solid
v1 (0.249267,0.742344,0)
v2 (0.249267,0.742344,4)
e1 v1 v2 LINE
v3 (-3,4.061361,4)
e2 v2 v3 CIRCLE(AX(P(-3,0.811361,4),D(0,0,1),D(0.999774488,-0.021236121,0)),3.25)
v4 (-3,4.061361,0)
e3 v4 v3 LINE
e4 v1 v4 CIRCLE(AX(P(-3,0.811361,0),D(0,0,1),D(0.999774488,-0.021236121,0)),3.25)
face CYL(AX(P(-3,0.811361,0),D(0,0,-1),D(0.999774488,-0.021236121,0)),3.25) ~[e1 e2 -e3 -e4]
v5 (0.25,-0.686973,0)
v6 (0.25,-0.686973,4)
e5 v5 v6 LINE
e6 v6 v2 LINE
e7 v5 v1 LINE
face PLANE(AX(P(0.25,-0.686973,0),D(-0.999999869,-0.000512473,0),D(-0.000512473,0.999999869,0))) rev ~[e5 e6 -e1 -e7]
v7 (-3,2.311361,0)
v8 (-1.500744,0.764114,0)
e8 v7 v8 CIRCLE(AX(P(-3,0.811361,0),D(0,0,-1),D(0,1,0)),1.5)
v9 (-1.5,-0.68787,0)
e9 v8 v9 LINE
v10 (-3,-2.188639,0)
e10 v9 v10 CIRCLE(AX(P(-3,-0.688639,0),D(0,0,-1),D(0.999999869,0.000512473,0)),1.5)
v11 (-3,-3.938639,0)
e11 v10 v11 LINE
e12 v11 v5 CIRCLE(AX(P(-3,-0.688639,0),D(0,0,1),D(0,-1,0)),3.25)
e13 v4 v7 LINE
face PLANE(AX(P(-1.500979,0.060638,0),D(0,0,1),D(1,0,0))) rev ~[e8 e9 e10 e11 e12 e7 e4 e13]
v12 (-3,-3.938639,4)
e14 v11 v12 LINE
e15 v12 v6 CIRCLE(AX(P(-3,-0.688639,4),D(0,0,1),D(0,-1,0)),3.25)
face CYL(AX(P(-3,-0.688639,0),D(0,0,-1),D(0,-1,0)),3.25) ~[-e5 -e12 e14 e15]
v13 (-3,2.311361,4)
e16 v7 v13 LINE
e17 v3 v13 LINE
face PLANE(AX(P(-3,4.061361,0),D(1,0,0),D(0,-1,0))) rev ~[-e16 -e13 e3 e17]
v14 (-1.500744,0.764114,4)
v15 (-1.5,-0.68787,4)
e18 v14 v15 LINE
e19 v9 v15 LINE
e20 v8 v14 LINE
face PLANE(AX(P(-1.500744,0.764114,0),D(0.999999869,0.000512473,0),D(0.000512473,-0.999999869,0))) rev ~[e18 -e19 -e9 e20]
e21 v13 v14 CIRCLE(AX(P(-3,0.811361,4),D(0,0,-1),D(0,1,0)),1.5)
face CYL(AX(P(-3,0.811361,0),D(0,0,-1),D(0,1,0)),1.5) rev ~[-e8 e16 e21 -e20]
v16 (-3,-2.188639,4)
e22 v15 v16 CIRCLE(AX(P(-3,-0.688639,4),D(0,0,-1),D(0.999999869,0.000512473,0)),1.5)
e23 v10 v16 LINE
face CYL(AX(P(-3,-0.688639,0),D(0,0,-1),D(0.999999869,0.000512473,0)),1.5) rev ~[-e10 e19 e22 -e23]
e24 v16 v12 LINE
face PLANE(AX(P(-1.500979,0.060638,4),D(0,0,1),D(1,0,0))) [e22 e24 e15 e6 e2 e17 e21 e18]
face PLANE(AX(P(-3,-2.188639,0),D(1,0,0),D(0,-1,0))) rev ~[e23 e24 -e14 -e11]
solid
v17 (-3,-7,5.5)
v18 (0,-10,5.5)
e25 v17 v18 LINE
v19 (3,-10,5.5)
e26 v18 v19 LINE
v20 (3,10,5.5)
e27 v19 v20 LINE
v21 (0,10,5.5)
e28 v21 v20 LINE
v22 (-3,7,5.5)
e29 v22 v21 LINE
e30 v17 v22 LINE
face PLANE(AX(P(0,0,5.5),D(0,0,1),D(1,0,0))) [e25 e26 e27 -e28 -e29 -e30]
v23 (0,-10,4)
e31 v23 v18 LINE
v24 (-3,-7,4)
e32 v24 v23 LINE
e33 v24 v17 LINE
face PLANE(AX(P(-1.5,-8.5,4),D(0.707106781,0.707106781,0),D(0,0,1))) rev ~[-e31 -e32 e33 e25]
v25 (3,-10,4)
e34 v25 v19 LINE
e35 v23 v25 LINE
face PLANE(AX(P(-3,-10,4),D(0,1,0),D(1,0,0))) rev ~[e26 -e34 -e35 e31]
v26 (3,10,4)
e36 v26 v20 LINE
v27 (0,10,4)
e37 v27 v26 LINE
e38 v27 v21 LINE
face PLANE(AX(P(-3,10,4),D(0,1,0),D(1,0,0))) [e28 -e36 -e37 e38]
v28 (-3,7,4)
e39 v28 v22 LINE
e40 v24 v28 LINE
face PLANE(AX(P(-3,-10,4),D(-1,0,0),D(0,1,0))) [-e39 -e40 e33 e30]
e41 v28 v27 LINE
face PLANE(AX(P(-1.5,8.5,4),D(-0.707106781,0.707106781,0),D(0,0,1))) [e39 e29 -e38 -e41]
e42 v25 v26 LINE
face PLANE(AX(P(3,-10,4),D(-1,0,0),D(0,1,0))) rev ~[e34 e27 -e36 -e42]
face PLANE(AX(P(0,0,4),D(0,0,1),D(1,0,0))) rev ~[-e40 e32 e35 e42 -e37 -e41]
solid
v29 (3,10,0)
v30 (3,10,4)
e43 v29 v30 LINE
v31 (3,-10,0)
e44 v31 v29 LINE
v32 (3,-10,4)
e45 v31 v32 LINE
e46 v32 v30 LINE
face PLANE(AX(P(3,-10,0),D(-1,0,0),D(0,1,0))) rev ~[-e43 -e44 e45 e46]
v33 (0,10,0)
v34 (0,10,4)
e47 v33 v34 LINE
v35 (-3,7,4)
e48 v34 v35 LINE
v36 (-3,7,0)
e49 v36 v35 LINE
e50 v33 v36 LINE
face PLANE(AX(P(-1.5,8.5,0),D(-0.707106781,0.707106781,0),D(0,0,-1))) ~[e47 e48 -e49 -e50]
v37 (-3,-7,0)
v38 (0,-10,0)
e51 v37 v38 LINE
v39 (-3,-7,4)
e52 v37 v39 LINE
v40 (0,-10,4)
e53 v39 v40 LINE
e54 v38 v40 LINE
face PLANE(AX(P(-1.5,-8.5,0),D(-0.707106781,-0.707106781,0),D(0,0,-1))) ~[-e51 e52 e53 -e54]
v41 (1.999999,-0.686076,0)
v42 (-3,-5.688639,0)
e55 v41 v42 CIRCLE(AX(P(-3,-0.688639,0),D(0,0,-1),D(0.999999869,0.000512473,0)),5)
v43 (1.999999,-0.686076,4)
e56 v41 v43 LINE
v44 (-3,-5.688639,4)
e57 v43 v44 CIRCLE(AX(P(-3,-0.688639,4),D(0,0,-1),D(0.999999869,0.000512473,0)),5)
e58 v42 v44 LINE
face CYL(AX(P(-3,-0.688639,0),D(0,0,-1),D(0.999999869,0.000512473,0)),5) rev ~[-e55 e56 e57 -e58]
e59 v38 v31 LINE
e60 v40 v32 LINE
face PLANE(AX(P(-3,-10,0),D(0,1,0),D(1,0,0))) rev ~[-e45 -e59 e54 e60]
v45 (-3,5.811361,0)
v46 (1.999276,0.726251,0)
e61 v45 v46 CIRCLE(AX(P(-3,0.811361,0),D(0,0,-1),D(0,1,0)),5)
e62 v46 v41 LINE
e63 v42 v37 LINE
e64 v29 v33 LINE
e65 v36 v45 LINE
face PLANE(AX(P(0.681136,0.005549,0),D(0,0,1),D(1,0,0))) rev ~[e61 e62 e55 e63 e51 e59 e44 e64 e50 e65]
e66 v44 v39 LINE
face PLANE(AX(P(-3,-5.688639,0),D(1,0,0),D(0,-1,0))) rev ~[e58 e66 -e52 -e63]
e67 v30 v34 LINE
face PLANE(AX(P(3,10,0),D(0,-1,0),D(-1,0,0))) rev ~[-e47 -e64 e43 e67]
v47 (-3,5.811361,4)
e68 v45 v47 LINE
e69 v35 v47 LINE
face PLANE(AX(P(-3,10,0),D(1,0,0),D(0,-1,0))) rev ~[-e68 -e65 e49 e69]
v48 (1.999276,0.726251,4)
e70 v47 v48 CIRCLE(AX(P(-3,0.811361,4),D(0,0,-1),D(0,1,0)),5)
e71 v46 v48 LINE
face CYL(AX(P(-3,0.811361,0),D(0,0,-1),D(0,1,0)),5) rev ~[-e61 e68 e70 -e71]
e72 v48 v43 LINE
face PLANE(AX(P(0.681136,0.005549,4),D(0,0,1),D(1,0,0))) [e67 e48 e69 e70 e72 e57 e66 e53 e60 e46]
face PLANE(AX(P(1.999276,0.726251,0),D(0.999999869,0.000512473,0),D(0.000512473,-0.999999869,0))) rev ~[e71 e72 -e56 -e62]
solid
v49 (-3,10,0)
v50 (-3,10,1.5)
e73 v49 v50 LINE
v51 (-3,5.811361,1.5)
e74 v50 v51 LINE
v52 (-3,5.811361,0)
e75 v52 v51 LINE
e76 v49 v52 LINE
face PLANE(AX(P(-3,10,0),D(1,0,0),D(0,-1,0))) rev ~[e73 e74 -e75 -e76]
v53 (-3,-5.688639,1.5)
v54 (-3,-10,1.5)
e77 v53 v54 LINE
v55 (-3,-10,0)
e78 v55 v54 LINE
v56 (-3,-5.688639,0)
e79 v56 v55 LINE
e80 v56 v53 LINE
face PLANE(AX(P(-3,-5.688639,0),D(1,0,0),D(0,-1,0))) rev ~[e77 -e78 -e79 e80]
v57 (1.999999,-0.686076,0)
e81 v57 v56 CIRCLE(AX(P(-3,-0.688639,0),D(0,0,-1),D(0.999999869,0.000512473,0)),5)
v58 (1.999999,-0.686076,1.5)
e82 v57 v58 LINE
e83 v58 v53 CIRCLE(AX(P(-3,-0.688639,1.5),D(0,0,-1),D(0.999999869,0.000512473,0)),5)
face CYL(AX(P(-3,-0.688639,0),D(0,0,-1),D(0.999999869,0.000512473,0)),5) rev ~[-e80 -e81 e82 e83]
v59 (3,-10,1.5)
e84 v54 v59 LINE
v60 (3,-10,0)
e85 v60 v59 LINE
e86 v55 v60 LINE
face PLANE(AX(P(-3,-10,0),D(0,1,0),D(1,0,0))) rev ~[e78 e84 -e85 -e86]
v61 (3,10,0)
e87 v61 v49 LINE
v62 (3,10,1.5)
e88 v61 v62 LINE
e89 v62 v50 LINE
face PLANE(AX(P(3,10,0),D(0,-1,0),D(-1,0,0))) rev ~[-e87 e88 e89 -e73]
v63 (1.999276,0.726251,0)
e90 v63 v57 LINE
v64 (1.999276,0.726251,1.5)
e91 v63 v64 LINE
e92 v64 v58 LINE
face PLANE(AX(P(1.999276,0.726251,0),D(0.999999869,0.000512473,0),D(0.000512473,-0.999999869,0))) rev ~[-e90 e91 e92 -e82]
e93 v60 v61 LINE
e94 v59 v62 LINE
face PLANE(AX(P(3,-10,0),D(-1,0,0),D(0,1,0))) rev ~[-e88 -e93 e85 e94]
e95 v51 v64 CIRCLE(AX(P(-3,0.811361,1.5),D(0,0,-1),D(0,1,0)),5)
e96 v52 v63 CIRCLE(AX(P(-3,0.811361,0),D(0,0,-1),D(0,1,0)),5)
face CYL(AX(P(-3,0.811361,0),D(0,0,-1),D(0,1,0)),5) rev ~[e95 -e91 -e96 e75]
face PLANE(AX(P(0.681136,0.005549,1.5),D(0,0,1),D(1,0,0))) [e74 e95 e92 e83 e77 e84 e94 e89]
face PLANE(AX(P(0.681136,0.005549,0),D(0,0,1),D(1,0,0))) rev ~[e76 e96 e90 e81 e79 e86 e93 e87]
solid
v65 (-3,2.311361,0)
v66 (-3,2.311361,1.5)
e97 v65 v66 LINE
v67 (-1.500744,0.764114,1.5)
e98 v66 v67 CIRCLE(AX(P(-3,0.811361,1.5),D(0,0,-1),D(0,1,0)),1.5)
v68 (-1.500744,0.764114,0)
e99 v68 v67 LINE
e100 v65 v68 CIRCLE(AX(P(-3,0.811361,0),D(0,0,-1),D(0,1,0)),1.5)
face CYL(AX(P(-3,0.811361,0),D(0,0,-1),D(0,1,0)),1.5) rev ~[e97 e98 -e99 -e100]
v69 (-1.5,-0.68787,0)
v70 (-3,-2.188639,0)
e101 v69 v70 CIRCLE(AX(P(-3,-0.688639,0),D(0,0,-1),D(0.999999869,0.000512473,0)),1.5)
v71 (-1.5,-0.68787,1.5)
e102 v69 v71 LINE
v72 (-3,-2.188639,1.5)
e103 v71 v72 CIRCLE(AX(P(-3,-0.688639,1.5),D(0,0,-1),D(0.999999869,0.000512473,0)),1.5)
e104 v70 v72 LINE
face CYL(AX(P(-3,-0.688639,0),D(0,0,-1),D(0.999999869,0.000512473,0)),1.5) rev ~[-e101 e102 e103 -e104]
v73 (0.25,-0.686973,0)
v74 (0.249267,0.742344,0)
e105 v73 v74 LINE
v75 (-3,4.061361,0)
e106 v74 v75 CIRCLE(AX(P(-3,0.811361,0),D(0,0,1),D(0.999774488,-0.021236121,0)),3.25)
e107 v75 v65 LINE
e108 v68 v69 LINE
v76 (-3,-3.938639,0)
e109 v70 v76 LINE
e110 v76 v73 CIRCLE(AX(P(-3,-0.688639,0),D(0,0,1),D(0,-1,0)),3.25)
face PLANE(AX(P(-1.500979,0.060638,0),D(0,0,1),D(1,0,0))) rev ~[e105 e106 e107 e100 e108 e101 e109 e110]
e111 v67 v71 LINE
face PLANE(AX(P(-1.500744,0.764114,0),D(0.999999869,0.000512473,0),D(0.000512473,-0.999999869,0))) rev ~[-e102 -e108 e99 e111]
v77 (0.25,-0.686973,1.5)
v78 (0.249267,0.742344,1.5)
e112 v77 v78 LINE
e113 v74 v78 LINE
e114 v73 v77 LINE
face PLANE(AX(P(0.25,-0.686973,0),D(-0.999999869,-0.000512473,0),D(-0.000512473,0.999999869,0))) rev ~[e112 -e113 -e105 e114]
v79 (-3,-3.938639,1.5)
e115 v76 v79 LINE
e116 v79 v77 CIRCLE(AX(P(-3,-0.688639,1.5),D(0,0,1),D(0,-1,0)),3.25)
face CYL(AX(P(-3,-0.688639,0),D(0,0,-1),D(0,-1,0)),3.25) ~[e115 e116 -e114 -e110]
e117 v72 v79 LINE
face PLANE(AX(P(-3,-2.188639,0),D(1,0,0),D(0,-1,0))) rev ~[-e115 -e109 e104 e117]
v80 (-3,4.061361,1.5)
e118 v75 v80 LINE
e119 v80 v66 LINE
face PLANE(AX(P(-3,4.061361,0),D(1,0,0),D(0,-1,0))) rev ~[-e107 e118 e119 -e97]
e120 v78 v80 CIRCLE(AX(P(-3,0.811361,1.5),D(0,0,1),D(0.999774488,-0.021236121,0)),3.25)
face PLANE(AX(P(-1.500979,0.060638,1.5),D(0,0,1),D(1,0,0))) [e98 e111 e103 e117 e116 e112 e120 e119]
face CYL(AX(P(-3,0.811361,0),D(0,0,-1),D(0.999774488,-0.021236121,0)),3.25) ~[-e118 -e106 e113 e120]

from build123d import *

# Parameters (mm, degrees)
F1_DEPTH  = 4
F3_W      = 6
F3_H      = 20
F4_DEPTH  = 1.5
F5_SIZE   = 3
F5_2_SIZE = 3


with BuildPart() as f1:
    # F0 (on Top) → F1 (new body)
    with BuildSketch(Plane.XY):
        with BuildLine():
            Line((3, -10), (3, 10))
            Line((3, 10), (-3, 10))
            Line((-3, 10), (-3, 5.8113613003))
            ThreePointArc((-3, 5.8113613003), (0.5654981212, 4.3166748595), (1.9992755637, 0.7262505595))
            Line((1.9992755637, 0.7262505595), (1.9999993434, -0.6860763339))
            ThreePointArc((1.9999993434, -0.6860763339), (0.536439723, -4.2232665564), (-3, -5.6886386997))
            Line((-3, -5.6886386997), (-3, -10))
            Line((-3, -10), (3, -10))
        make_face()
    extrude(amount=F1_DEPTH)

    # F5
    f5_edges = [f1.edges().sort_by_distance(p)[0] for p in [
        (-3, 10, 2),
        (-3, -10, 2),
    ]]
    chamfer(f5_edges, length=F5_SIZE)


with BuildPart() as f1b:
    # F0 (on Top) → F1, piece 2 (new body)
    with BuildSketch(Plane.XY):
        with BuildLine():
            ThreePointArc((-3, 2.3113613003), (-1.9227647543, 1.8551832321), (-1.5007442997, 0.7641136008))
            Line((-1.5007442997, 0.7641136008), (-1.500000197, -0.68786999))
            ThreePointArc((-1.500000197, -0.68786999), (-1.9390680831, -1.7490270567), (-3, -2.1886386997))
            Line((-3, -2.1886386997), (-3, -3.9386386997))
            ThreePointArc((-3, -3.9386386997), (-0.70131418, -2.9861468066), (0.2499995732, -0.6869731619))
            Line((0.2499995732, -0.6869731619), (0.2492670865, 0.7423439064))
            ThreePointArc((0.2492670865, 0.7423439064), (-0.6776298174, 3.084926064), (-3, 4.0613613003))
            Line((-3, 4.0613613003), (-3, 2.3113613003))
        make_face()
    extrude(amount=F1_DEPTH)


with BuildPart() as f4:
    # F3 (on face) → F4 (new body)
    with BuildSketch(Plane.XY.offset(4)):
        Rectangle(F3_W, F3_H)
    extrude(amount=F4_DEPTH)

    # F5#2
    f5_2_edges = [f4.edges().sort_by_distance(p)[0] for p in [
        (-3, 10, 4.75),
        (-3, -10, 4.75),
    ]]
    chamfer(f5_2_edges, length=F5_2_SIZE)


with BuildPart() as f4b:
    # F0 (on Top) → F4, piece 2 (new body)
    with BuildSketch(Plane.XY):
        with BuildLine():
            Line((3, -10), (3, 10))
            Line((3, 10), (-3, 10))
            Line((-3, 10), (-3, 5.8113613003))
            ThreePointArc((-3, 5.8113613003), (0.5654981212, 4.3166748595), (1.9992755637, 0.7262505595))
            Line((1.9992755637, 0.7262505595), (1.9999993434, -0.6860763339))
            ThreePointArc((1.9999993434, -0.6860763339), (0.536439723, -4.2232665564), (-3, -5.6886386997))
            Line((-3, -5.6886386997), (-3, -10))
            Line((-3, -10), (3, -10))
        make_face()
    extrude(amount=F4_DEPTH)


with BuildPart() as f4c:
    # F0 (on Top) → F4, piece 3 (new body)
    with BuildSketch(Plane.XY):
        with BuildLine():
            ThreePointArc((-3, 2.3113613003), (-1.9227647543, 1.8551832321), (-1.5007442997, 0.7641136008))
            Line((-1.5007442997, 0.7641136008), (-1.500000197, -0.68786999))
            ThreePointArc((-1.500000197, -0.68786999), (-1.9390680831, -1.7490270567), (-3, -2.1886386997))
            Line((-3, -2.1886386997), (-3, -3.9386386997))
            ThreePointArc((-3, -3.9386386997), (-0.70131418, -2.9861468066), (0.2499995732, -0.6869731619))
            Line((0.2499995732, -0.6869731619), (0.2492670865, 0.7423439064))
            ThreePointArc((0.2492670865, 0.7423439064), (-0.6776298174, 3.084926064), (-3, 4.0613613003))
            Line((-3, 4.0613613003), (-3, 2.3113613003))
        make_face()
    extrude(amount=F4_DEPTH)


solid = Compound([f1.part, f1b.part, f4.part, f4b.part, f4c.part])
